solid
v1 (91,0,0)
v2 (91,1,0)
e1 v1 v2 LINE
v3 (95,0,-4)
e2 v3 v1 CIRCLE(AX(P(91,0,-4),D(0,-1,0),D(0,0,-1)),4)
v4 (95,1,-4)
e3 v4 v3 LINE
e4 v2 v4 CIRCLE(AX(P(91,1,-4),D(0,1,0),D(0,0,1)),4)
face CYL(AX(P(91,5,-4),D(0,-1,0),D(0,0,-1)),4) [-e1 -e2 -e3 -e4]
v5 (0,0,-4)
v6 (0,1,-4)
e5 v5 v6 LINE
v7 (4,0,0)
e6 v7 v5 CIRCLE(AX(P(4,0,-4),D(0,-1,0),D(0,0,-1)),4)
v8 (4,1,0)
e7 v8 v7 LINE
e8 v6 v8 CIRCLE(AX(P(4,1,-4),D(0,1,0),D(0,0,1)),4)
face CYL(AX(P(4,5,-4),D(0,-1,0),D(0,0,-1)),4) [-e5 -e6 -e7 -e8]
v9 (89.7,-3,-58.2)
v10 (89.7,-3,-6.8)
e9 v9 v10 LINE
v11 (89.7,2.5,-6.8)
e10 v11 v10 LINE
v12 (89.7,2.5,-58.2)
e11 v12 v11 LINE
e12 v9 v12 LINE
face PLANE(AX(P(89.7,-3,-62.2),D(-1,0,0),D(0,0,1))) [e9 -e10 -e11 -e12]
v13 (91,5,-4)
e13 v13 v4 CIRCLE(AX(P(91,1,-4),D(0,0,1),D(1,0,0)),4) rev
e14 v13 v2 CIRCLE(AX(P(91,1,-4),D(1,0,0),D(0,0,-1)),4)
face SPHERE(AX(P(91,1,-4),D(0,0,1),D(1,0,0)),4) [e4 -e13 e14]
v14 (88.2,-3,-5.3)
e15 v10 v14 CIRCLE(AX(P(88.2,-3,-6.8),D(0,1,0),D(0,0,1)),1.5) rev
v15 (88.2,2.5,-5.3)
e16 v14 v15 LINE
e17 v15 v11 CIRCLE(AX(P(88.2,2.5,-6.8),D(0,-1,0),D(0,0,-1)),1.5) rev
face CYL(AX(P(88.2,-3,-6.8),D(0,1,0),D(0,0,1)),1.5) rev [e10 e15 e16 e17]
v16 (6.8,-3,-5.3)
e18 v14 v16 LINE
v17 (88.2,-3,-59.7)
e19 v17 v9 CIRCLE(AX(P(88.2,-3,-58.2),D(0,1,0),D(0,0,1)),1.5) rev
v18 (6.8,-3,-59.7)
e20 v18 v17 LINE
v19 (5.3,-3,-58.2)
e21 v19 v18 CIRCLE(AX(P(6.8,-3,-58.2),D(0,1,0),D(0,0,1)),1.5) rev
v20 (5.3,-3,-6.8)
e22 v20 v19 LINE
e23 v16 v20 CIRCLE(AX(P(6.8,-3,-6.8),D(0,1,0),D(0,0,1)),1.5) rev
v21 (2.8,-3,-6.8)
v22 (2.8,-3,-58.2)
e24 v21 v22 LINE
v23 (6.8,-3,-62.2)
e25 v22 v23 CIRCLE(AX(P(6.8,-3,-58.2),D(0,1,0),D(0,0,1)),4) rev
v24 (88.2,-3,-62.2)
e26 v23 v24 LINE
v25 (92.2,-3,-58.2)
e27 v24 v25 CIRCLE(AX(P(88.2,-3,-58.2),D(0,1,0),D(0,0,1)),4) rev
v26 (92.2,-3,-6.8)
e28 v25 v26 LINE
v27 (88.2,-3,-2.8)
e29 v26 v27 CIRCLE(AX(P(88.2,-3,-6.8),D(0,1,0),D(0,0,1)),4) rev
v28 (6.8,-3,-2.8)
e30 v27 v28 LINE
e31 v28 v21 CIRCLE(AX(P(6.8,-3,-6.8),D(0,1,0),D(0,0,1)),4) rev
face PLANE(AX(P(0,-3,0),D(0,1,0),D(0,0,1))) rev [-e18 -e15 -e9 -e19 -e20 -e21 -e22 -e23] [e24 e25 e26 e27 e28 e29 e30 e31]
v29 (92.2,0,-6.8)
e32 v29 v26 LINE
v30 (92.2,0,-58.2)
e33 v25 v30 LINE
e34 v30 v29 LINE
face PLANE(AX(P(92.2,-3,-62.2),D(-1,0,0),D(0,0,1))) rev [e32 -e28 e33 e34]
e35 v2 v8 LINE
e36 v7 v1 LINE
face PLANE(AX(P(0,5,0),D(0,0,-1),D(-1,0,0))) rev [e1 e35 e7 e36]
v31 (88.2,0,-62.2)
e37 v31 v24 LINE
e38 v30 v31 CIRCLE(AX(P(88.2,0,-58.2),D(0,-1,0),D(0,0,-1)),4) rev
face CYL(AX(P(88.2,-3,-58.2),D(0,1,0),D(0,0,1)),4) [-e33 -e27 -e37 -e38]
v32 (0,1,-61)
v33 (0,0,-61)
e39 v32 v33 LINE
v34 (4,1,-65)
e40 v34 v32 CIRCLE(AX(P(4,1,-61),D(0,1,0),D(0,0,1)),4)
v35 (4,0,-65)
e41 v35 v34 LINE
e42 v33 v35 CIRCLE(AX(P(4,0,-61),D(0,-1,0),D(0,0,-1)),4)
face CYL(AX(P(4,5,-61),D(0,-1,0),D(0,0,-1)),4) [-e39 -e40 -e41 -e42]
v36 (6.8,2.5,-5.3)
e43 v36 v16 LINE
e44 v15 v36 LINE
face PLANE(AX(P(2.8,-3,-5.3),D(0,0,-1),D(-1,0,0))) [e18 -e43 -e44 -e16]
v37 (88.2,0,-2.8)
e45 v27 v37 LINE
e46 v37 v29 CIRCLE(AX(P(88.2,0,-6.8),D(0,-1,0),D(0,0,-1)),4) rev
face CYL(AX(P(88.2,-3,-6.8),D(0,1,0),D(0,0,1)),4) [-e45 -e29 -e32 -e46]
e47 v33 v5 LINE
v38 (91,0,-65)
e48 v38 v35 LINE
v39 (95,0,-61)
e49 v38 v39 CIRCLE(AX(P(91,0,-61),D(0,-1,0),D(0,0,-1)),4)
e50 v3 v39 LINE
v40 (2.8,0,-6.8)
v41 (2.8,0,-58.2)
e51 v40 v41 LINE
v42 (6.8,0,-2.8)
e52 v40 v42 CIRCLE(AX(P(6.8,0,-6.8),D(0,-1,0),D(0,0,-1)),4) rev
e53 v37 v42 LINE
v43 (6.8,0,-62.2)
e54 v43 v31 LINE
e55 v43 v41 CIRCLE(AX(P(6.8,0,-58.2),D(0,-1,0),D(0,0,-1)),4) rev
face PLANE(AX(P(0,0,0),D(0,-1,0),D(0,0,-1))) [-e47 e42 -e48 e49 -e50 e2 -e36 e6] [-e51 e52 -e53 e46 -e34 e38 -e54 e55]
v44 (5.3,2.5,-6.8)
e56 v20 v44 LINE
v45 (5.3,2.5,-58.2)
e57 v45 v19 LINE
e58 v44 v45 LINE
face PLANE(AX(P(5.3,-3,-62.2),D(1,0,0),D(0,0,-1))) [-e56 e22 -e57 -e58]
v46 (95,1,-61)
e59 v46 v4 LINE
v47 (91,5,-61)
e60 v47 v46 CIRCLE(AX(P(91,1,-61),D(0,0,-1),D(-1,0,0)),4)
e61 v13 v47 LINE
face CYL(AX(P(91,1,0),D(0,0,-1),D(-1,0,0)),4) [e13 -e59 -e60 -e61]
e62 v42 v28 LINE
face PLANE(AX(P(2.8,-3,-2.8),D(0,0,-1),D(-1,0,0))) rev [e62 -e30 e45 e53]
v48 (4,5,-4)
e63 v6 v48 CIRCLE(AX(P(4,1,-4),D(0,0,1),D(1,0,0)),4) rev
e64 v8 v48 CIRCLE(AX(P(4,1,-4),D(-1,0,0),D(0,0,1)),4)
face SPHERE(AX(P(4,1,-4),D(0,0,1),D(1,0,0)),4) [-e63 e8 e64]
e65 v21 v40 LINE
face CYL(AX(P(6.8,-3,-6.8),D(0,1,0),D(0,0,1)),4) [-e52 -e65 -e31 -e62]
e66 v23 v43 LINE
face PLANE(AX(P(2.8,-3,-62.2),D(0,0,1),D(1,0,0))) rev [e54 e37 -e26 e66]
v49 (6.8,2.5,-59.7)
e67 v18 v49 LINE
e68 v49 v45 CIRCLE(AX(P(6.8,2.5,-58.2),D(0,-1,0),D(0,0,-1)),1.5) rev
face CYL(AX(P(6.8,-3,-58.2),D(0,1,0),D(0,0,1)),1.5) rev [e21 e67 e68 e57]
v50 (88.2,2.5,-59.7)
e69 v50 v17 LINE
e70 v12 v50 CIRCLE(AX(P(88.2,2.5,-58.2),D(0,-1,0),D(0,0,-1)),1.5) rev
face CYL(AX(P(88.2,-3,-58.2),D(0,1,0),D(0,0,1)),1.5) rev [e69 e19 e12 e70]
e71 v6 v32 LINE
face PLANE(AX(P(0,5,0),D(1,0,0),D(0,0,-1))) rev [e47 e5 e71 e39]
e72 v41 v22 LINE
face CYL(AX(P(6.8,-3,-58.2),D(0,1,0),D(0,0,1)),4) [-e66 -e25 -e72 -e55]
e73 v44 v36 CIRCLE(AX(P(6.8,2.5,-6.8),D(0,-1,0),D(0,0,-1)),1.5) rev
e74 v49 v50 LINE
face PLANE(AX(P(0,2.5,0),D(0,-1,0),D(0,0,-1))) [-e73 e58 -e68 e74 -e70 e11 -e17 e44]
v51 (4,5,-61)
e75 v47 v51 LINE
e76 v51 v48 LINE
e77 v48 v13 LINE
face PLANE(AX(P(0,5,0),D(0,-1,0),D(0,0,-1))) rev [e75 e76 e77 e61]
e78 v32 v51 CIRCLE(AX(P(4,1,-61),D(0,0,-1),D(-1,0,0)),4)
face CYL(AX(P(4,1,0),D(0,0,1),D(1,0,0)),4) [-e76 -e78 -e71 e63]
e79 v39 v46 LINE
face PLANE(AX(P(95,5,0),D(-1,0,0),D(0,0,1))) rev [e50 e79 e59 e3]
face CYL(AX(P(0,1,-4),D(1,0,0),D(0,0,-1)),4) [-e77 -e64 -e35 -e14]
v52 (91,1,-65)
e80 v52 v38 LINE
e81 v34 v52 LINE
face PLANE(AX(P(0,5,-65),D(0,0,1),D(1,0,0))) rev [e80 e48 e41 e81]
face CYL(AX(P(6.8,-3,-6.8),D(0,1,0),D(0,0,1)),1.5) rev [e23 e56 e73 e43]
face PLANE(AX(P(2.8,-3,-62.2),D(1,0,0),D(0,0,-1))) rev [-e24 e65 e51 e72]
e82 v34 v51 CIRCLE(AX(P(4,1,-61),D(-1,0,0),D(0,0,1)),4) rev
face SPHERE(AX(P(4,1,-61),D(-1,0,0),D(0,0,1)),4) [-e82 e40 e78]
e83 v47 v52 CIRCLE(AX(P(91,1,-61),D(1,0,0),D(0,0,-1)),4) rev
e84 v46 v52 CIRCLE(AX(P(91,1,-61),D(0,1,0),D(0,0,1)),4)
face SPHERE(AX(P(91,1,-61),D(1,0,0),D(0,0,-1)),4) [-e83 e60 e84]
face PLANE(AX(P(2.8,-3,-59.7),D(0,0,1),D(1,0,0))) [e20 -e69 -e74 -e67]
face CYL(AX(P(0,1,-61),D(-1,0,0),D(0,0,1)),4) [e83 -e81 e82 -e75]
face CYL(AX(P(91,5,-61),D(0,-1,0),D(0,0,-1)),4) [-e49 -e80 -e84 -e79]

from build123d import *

# Parameters (mm, degrees)
SKETCH1_W           = 95
SKETCH1_H           = 65
BOSS_EXTRUDE1_DEPTH = 5
FILLET2_R           = 4
SKETCH3_W           = 89.4
SKETCH3_H           = 59.4
BOSS_EXTRUDE3_DEPTH = 3
FILLET3_R           = 4
SHELL1_START        = -3
SHELL1_DEPTH        = 5.5


# Read off the part's stored shape, not the designer's step: Shell1
with BuildPart() as part:
    # Sketch1 → Boss-Extrude1 (new body)
    with BuildSketch(Plane(origin=(0, 0, 0), x_dir=(1, 0, 0), z_dir=(0, 1, 0))):
        with Locations((47.5, 32.5)):
            Rectangle(SKETCH1_W, SKETCH1_H)
    extrude(amount=BOSS_EXTRUDE1_DEPTH)

    # Fillet2
    fillet2_edges = [part.edges().sort_by_distance(p)[0] for p in [
        (95, 5, -32.5),
        (47.5, 5, -65),
        (0, 5, -32.5),
        (0, 2.5, -65),
        (95, 2.5, -65),
        (95, 2.5, 0),
        (0, 2.5, 0),
        (47.5, 5, 0),
    ]]
    fillet(fillet2_edges, radius=FILLET2_R)

    # Sketch3 → Boss-Extrude3 (add)
    with BuildSketch(Plane.XZ):
        with Locations((47.5, -32.5)):
            Rectangle(SKETCH3_W, SKETCH3_H)
    extrude(amount=BOSS_EXTRUDE3_DEPTH)

    # Fillet3
    fillet3_edges = [part.edges().sort_by_distance(p)[0] for p in [
        (2.8, -1.5, -2.8),
        (2.8, -1.5, -62.2),
        (92.2, -1.5, -62.2),
        (92.2, -1.5, -2.8),
    ]]
    fillet(fillet3_edges, radius=FILLET3_R)

    # Shell1 outline → Shell1 (cut)
    with BuildSketch(Plane(origin=(0, 0, 0), x_dir=(1, 0, 0), z_dir=(0, 1, 0)).offset(SHELL1_START)):
        with BuildLine():
            Line((5.3, 58.2), (5.3, 6.8))
            ThreePointArc((5.3, 6.8), (5.739339828, 5.739339828), (6.8, 5.3))
            Line((6.8, 5.3), (88.2, 5.3))
            ThreePointArc((88.2, 5.3), (89.260660172, 5.739339828), (89.7, 6.8))
            Line((89.7, 6.8), (89.7, 58.2))
            ThreePointArc((89.7, 58.2), (89.260660172, 59.260660172), (88.2, 59.7))
            Line((88.2, 59.7), (6.8, 59.7))
            ThreePointArc((6.8, 59.7), (5.739339828, 59.260660172), (5.3, 58.2))
        make_face()
    extrude(amount=SHELL1_DEPTH, mode=Mode.SUBTRACT)


solid = part.part
